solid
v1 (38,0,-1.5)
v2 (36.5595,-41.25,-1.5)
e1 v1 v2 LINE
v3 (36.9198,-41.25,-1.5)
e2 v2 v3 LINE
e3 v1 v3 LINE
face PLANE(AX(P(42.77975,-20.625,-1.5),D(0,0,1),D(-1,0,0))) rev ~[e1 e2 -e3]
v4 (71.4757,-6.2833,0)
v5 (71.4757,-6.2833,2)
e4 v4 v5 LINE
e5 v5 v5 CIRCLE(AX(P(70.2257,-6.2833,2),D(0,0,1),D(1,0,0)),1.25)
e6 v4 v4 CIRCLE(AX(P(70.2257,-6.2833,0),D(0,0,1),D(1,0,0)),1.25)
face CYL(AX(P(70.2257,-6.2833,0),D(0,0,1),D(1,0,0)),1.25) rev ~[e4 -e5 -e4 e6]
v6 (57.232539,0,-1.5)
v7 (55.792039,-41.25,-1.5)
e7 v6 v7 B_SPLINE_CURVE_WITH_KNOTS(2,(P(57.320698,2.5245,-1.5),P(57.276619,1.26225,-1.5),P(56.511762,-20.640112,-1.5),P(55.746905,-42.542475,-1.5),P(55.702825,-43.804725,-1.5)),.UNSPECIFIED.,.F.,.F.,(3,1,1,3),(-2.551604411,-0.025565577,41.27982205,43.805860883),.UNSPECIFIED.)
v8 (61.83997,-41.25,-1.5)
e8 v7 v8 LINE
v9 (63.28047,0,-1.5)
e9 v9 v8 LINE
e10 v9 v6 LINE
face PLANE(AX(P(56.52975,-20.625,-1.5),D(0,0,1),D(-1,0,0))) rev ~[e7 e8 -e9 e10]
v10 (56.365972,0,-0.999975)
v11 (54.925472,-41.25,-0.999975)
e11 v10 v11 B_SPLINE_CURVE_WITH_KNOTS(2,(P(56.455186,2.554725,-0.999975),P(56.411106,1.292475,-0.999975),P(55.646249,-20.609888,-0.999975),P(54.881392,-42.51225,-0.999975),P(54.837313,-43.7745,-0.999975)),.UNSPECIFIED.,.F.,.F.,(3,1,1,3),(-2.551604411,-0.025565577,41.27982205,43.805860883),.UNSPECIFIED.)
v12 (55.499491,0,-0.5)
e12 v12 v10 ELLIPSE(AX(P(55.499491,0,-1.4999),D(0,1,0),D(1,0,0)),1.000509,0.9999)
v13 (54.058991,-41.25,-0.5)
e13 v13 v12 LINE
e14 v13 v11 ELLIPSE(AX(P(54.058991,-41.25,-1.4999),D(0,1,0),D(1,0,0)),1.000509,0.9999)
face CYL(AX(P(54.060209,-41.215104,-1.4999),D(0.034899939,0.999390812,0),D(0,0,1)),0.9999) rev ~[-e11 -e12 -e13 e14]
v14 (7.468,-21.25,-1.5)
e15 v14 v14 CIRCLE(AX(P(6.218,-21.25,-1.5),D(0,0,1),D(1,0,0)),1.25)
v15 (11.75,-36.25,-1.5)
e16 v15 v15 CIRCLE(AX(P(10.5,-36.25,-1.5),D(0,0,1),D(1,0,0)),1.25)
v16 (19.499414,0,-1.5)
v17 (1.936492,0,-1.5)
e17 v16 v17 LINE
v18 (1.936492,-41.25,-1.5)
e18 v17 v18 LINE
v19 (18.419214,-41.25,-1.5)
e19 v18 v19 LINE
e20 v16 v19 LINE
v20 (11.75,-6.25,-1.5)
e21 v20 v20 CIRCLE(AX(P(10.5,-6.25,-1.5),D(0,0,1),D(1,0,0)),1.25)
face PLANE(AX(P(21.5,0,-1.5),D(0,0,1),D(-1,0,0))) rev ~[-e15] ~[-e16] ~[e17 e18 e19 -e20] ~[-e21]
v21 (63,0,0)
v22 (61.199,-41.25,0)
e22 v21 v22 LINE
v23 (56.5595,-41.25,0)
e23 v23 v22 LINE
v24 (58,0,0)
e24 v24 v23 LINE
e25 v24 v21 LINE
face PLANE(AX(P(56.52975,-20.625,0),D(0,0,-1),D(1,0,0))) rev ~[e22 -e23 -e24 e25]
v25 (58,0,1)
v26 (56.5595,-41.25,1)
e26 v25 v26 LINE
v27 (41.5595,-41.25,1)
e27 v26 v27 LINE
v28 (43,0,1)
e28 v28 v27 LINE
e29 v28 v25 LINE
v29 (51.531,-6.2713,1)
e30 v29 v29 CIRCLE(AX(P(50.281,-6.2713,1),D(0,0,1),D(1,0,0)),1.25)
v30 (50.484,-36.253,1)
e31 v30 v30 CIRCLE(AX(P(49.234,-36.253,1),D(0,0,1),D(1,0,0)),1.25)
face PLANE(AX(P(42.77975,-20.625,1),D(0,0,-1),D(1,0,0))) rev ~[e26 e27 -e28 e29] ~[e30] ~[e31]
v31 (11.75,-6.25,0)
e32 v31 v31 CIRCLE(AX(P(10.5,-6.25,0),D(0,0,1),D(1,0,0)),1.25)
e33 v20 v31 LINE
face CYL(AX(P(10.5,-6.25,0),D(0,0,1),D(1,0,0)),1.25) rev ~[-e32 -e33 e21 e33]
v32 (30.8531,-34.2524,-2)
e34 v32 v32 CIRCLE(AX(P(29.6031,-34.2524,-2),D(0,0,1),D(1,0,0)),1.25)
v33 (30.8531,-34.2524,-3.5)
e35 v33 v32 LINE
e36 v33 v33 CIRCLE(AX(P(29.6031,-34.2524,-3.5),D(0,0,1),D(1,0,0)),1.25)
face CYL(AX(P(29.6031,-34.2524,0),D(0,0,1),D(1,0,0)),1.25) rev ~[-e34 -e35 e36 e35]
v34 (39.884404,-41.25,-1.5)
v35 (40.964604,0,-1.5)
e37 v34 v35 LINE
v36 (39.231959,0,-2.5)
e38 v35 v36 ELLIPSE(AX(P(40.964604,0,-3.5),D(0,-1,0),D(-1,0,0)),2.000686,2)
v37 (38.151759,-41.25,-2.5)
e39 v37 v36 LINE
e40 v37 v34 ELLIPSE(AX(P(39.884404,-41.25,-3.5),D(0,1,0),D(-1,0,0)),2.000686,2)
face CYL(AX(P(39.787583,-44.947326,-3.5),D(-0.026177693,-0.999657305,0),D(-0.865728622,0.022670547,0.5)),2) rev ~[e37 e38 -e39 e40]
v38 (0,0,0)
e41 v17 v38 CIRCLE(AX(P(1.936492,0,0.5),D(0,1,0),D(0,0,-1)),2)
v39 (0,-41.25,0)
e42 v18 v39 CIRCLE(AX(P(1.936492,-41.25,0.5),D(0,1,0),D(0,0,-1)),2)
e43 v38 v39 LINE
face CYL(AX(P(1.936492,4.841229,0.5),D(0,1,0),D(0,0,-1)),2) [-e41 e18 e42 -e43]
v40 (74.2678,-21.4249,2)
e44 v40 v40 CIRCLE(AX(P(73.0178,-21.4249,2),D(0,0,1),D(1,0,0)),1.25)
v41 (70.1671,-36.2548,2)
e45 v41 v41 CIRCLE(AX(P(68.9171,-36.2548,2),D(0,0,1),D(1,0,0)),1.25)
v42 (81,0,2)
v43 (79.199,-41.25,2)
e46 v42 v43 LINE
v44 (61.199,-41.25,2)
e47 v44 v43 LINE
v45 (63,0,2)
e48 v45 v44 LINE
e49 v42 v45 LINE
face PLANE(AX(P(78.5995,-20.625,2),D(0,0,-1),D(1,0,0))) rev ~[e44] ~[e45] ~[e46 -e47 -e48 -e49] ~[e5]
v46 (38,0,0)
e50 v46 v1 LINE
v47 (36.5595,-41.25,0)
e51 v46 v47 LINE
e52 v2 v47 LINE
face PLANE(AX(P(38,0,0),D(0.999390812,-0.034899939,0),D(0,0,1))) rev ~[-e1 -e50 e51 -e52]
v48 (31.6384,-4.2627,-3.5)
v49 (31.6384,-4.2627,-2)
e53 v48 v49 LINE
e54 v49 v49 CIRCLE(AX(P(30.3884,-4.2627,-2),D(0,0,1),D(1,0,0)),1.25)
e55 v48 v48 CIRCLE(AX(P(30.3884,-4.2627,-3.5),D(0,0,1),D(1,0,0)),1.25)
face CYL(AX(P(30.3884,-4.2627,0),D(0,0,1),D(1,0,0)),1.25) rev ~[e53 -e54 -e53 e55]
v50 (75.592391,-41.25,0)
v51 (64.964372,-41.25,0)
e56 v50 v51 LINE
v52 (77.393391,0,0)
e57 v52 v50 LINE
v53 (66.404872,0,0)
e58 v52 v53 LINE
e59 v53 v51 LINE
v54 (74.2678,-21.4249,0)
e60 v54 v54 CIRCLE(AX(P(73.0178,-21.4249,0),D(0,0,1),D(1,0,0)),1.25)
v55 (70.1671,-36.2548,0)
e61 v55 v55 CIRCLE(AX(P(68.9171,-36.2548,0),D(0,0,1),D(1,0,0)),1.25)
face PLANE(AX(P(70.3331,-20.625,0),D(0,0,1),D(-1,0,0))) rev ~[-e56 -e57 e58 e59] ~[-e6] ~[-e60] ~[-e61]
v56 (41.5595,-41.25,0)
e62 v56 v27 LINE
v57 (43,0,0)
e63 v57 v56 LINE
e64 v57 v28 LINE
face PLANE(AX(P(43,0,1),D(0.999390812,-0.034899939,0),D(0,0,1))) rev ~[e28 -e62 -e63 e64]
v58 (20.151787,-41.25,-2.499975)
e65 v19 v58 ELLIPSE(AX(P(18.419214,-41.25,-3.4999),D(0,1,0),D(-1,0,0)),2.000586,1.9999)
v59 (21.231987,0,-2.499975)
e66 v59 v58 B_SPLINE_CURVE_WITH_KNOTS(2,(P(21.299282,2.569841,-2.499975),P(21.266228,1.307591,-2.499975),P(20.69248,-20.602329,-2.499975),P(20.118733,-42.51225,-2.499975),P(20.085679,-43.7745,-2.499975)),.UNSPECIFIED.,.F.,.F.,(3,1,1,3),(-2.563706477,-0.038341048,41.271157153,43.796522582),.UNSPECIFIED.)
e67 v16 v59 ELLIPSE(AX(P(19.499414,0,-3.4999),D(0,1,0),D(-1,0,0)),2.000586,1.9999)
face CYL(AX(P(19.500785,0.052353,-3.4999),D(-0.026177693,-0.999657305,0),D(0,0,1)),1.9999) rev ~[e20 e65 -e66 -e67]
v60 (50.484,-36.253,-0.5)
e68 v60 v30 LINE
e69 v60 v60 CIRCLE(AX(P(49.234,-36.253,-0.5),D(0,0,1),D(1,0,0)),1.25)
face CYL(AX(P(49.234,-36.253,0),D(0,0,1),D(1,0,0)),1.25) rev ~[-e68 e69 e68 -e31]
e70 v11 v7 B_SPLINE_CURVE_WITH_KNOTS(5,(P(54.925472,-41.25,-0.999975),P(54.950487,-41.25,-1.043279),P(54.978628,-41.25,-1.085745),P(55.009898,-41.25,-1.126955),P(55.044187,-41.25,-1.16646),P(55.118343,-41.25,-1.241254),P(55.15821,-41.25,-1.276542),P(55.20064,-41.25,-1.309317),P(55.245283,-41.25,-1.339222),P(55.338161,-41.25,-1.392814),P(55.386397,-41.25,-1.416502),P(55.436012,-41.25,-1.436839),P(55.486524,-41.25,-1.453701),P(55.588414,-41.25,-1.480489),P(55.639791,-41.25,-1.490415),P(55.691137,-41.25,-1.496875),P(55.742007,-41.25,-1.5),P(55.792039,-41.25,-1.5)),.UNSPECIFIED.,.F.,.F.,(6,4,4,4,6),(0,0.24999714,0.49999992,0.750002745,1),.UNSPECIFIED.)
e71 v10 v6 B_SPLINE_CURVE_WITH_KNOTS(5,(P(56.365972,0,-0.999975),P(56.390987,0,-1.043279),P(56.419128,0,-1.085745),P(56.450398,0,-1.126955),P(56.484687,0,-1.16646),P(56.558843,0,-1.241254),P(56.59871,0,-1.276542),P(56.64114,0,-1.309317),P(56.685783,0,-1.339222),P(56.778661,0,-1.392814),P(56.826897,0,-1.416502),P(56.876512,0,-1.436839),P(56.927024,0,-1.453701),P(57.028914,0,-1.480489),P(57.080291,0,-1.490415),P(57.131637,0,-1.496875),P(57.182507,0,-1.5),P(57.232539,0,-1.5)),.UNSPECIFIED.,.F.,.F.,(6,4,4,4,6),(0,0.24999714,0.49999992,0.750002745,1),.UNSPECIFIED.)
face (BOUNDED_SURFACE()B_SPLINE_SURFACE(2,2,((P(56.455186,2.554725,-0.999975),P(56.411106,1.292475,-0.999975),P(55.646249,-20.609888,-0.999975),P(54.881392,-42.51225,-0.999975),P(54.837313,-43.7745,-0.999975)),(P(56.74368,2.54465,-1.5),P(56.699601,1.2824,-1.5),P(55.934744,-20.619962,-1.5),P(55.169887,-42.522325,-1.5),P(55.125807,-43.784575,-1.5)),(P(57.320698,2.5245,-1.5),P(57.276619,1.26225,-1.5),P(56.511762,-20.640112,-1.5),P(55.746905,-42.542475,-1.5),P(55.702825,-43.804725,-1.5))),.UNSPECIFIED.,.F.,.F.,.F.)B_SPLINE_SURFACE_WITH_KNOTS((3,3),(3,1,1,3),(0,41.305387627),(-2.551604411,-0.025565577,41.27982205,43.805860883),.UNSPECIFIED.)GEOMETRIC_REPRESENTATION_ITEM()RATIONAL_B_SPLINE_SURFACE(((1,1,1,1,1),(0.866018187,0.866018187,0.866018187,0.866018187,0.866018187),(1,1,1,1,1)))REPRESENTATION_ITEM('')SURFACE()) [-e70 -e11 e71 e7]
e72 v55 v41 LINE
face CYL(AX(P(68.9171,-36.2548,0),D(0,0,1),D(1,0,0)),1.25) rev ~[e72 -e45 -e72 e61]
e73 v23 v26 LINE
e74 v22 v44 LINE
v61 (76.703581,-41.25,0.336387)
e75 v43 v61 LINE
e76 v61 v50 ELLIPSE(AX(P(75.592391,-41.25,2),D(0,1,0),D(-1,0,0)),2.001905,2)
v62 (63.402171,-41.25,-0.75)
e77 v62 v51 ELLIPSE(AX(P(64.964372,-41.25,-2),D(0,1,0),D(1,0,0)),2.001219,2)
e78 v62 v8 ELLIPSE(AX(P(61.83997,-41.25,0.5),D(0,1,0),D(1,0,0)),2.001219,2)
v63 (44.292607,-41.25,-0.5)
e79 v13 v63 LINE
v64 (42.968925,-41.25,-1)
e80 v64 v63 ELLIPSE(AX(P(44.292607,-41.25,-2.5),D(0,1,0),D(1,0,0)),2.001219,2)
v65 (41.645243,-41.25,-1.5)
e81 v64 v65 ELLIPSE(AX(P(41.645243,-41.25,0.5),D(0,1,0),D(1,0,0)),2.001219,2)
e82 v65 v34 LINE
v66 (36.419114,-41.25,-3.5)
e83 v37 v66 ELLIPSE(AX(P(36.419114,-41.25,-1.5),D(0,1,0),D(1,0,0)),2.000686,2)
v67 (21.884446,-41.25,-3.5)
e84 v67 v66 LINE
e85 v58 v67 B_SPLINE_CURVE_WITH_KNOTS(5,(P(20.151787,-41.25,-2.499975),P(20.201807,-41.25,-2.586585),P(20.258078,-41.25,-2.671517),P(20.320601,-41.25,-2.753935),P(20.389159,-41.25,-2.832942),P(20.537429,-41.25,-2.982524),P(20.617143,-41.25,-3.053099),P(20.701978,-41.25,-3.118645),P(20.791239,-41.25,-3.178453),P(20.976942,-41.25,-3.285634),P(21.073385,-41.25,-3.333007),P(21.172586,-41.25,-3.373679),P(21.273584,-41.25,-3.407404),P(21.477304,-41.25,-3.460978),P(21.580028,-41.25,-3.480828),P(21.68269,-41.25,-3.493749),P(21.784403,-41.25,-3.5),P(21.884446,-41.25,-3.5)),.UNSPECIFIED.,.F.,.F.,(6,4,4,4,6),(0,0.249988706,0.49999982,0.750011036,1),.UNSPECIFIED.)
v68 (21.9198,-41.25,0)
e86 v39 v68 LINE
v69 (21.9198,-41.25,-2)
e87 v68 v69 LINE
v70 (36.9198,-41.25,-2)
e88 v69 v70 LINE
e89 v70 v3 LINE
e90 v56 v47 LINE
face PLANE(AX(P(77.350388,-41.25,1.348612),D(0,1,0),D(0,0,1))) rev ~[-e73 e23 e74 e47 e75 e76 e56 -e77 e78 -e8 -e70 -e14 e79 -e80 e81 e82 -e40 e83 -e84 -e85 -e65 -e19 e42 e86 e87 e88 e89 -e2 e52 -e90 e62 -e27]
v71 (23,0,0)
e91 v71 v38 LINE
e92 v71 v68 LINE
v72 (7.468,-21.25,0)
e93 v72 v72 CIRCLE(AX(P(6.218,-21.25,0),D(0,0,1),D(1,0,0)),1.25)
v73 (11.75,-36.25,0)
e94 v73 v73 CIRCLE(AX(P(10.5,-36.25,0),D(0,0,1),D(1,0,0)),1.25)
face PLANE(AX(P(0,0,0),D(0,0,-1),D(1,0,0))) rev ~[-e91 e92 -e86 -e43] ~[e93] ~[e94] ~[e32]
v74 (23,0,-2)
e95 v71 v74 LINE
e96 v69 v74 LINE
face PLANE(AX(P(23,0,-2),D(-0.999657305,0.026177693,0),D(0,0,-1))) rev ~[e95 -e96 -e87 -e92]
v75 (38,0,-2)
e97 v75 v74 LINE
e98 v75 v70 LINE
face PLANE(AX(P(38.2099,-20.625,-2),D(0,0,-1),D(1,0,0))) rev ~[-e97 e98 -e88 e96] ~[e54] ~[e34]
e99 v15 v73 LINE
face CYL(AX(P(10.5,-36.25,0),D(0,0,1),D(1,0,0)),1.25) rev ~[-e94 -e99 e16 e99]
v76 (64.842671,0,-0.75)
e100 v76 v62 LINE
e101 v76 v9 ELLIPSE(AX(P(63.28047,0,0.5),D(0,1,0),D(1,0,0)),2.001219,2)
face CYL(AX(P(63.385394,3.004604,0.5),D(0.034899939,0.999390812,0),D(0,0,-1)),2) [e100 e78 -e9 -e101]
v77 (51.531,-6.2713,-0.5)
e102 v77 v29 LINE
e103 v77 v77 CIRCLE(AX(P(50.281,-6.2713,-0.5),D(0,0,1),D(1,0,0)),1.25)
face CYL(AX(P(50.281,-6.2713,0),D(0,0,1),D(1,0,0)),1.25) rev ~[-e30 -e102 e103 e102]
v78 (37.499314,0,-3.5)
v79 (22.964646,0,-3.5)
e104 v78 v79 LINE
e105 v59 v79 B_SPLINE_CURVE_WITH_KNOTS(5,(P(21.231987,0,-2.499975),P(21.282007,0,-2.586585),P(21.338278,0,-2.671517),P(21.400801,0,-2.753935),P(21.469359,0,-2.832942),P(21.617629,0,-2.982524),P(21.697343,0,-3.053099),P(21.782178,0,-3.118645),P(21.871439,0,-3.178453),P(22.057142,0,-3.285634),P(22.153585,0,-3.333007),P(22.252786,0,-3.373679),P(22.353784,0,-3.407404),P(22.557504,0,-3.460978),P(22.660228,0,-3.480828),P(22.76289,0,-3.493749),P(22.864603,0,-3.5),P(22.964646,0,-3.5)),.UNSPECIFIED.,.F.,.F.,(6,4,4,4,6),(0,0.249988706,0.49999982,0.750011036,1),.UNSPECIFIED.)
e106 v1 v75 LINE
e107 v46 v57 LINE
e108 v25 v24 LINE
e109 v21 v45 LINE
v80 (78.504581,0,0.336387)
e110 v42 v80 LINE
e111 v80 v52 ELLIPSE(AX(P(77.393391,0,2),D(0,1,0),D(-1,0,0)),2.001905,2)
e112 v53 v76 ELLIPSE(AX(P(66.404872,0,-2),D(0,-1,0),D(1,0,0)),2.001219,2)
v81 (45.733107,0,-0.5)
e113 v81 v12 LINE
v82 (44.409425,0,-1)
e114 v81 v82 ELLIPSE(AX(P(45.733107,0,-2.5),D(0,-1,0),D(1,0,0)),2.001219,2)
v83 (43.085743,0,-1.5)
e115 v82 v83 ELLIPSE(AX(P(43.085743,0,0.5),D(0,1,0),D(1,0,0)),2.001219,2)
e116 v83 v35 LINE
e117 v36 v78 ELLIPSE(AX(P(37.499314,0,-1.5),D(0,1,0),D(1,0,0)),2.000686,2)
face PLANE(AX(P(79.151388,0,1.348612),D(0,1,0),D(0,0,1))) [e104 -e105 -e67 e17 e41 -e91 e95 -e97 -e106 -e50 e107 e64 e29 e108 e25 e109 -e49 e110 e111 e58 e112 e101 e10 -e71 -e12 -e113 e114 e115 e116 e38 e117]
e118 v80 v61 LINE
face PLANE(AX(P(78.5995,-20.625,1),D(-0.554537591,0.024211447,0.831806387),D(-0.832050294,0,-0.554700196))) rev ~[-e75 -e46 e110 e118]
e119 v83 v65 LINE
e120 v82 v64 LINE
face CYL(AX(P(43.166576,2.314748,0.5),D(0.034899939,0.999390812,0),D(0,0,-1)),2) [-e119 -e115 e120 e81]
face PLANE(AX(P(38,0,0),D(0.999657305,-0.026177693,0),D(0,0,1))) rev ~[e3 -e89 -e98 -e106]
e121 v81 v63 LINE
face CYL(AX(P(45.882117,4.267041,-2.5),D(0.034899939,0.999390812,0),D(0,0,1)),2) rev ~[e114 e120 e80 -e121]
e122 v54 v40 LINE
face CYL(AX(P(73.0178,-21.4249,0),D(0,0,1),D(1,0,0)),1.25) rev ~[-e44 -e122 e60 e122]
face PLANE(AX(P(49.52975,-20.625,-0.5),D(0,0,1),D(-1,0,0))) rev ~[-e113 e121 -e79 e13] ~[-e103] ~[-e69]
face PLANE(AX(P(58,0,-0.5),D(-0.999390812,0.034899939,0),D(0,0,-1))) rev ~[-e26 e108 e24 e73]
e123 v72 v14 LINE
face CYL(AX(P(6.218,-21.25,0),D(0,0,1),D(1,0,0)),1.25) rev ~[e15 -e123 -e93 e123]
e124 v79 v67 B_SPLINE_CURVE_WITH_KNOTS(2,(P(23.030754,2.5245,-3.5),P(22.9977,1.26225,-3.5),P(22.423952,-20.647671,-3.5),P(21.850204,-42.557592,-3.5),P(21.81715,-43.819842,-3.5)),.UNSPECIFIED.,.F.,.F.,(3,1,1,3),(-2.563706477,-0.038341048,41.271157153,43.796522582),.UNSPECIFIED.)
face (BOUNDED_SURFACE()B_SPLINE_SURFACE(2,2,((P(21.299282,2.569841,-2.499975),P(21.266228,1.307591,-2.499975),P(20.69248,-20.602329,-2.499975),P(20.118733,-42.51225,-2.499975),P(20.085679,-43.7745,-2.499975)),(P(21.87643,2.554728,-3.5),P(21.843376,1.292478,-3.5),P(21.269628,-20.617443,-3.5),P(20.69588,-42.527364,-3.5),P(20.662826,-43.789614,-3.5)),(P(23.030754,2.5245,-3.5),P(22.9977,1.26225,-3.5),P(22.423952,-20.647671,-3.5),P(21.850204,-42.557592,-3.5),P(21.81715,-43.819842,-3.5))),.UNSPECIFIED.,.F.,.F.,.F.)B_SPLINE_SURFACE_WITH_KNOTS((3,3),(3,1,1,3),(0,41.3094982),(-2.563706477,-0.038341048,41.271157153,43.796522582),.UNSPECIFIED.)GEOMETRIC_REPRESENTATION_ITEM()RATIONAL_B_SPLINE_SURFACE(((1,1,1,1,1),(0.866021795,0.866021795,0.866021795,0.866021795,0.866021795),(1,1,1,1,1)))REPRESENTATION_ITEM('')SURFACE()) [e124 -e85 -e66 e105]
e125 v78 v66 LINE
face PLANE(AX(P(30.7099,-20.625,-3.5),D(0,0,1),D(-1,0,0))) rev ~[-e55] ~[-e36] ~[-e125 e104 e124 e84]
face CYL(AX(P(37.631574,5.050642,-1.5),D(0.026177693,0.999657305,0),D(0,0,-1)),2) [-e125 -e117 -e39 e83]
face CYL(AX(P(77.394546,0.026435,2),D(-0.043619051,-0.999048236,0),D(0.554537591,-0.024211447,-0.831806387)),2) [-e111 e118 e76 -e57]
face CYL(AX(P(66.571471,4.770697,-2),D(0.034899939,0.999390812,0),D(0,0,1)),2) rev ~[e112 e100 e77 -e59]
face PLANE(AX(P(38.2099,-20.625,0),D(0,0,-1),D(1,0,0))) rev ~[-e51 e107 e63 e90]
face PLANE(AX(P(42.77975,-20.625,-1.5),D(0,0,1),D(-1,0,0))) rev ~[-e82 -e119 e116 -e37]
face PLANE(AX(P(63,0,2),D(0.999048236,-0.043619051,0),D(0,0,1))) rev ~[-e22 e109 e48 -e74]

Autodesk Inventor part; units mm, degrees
ref_plane "YZ Plane" through (0, 0, 0) normal (1, 0, 0) x (0, 1, 0)
ref_plane "XY Plane" through (0, 0, 0) normal (0, 0, 1) x (1, 0, 0)
sketch "Sketch1" plane through (0, 0, 0) normal (0, 0, 1) x (1, 0, 0)
  line L0 (0, 0) -> (81, 0)
  line L1 (0, 0) -> (0, -41.25)
  line L2 (0, -41.25) -> (76.5595, -41.25)
  line L3 (10.5, 0) -> (10.5, -41.25)
  line L4 (30.5, 0) -> (29.4198, -41.25)
  line L5 (30.5, 0) -> (71.7641, 0) construction
  line L6 (50.5, 0) -> (49.0595, -41.25)
  line L7 (70.5, 0) -> (68.699, -41.25)
  line L8 (78, 0) -> (76.5595, -41.25)
  line L9 (78, 0) -> (119.2751, 0) construction
  line L10 (76.5595, -41.25) -> (81, 0)
  line L11 (3, 0) -> (3, -41.25)
  line L12 (18, 0) -> (18, -41.25)
  line L13 (23, 0) -> (21.9198, -41.25)
  line L14 (23, 0) -> (64.2641, 0) construction
  line L15 (38, 0) -> (36.9198, -41.25)
  line L16 (38, 0) -> (79.2641, 0) construction
  line L17 (43, 0) -> (41.5595, -41.25)
  line L18 (43, 0) -> (84.2751, 0) construction
  line L19 (58, 0) -> (56.5595, -41.25)
  line L20 (58, 0) -> (99.2751, 0) construction
  line L21 (63, 0) -> (61.199, -41.25)
  line L22 (63, 0) -> (104.2893, 0) construction
  line L23 (29.4198, -41.25) -> (29.6031, -34.2524)
  line L24 (29.6031, -34.2524) -> (30.3884, -4.2627)
  line L25 (49.0595, -41.25) -> (49.234, -36.253)
  line L26 (49.234, -36.253) -> (50.281, -6.2713)
  line L27 (68.699, -41.25) -> (68.9171, -36.2548)
  line L28 (68.9171, -36.2548) -> (70.2257, -6.2833)
  circle A0 centre (10.5, -6.25) radius 1.25
  circle A1 centre (10.5, -36.25) radius 1.25
  circle A2 centre (30.3884, -4.2627) radius 1.25
  circle A3 centre (29.6031, -34.2524) radius 1.25
  circle A4 centre (50.281, -6.2713) radius 1.25
  circle A5 centre (49.234, -36.253) radius 1.25
  circle A6 centre (70.2257, -6.2833) radius 1.25
  circle A7 centre (68.9171, -36.2548) radius 1.25
  line L29 (10.5, -6.25) -> (10.5, -21.25)
  line L30 (10.5, -21.25) -> (6.218, -21.25)
  circle A8 centre (6.218, -21.25) radius 1.25
  line L31 (6.218, -21.25) -> (73.0178, -21.4249)
  line L32 (6.218, -21.25) -> (73.018, -21.25) construction
  circle A9 centre (73.0178, -21.4249) radius 1.25
  dimension "d10" = 92
  dimension "d11" = 91.5
  dimension "d12" = 91.5
  dimension "d13" = 92
  dimension "d14" = 92
  dimension "d15" = 92.5
  dimension "d67" = 2.5
  dimension "d68" = 2.5
  dimension "d69" = 2.5
  dimension "d70" = 2.5
  dimension "d71" = 2.5
  dimension "d72" = 2.5
  dimension "d73" = 2.5
  dimension "d74" = 2.5
  dimension "d77" = 15
  dimension "d78" = 4.282
  dimension "d79" = 2.5
  dimension "d80" = 66.8
  dimension "d81" = 0.15
  dimension "d82" = 2.5
sketch "Sketch2" plane through (0, 0, 0) normal (0, 1, 0) x (-1, 0, 0)
  line L0 (-43, 0) -> (-58, 0)
  line L1 (-58, 0) -> (-58, 1)
  line L2 (-58, 1) -> (-43, 1)
  line L3 (-43, 1) -> (-43, 0)
  line L4 (-64.4672, 0) -> (-78, 0)
  line L5 (-78, 0) -> (-78, 2)
  line L6 (-78, 2) -> (-63, 2)
  line L7 (-63, 2) -> (-63, 0)
  line L8 (-23, 0) -> (-21.9198, 0) projected
  line L9 (-30.5, 0) -> (-29.4198, 0) projected
  line L10 (-23, 0) -> (-38, 0)
  line L11 (-38, 0) -> (-38, -2)
  line L12 (-38, -2) -> (-23, -2)
  line L13 (-23, -2) -> (-23, 0)
  line L14 (0, 0) -> (-23, 0)
  line L15 (-23, 0) -> (-23, -1.5)
  line L16 (-21.5, -1.5) -> (0, -1.5)
  line L17 (0, -1.5) -> (0, 0)
  line L18 (-23, 0) -> (-21.5, 0)
  line L19 (-21.5, -1.5) -> (-21.5, -3.5)
  line L20 (-21.5, -3.5) -> (-23, -3.5)
  line L21 (-23, -2) -> (-23, 0)
  line L22 (-23, -2) -> (-38, -2)
  line L23 (-39.5, -2) -> (-39.5, -3.5)
  line L24 (-39.5, -3.5) -> (-23, -3.5)
  line L25 (-39.5, -2) -> (-39.5, -1.5)
  line L26 (-39.5, 0) -> (-38, 0)
  line L27 (-38, 0) -> (-38, -2)
  line L28 (-38, 0) -> (-43, 0)
  line L29 (-43, -0.5) -> (-43, -1.5)
  line L30 (-43, -1.5) -> (-39.5, -1.5)
  line L31 (-38, -1.5) -> (-38, 0)
  line L32 (-43, 1) -> (-58, 1)
  line L33 (-58, 1) -> (-58, 0)
  line L34 (-56.5, -0.5) -> (-44, -0.5)
  line L35 (-43, -0.5) -> (-43, 1)
  line L36 (-38, 0) -> (-44, 0)
  line L37 (-44, -0.5) -> (-44, -1.5)
  line L38 (-44, -1.5) -> (-38, -1.5)
  line L39 (-38, -1.5) -> (-38, 0)
  line L40 (-56.5, 0) -> (-63, 0)
  line L41 (-64.4672, 0) -> (-64.4672, -1.5)
  line L42 (-64.4672, -1.5) -> (-56.5, -1.5)
  line L43 (-56.5, -1.5) -> (-56.5, -0.5)
  line L44 (-81, 2) -> (-78, 2)
  line L45 (-81, 2) -> (-78, 0)
  line L46 (-18, 0) -> (-18, -1.5)
  line L47 (0, 0) -> (-18, 0)
  line L48 (-18, 0) -> (-18, -1.5)
  line L49 (-18, -1.5) -> (0, -1.5)
  line L50 (0, -1.5) -> (0, 0)
  line L51 (-18, -1.5) -> (-18, 0)
  line L52 (-23, 0) -> (-23, -2)
  line L53 (-38, -2) -> (-38, 0)
  line L54 (-43, 0) -> (-43, -1.5)
  line L55 (-18, -1.5) -> (-21.5, -1.5)
  line L56 (-38, -2) -> (-23, -2)
  line L57 (-23, -2) -> (-23, 0)
  line L58 (-23, 0) -> (-18, 0)
  line L59 (-18, 0) -> (-18, -1.5)
  line L60 (-18, 0) -> (-23, 0)
  line L61 (-23, 0) -> (-23, -1.5)
  line L62 (-23, -1.5) -> (-18, -1.5)
  line L63 (-18, -1.5) -> (-18, 0)
  line L64 (-23, 0) -> (-21.5, 0)
  line L65 (-21.5, 0) -> (-21.5, -3.5)
  line L66 (-21.5, -3.5) -> (-23, -3.5)
  line L67 (-23, -3.5) -> (-23, 0)
  line L68 (-21.5, -3.5) -> (-39.5, -3.5)
  line L69 (-39.5, -3.5) -> (-39.5, -2)
  line L70 (-39.5, -2) -> (-21.5, -2)
  line L71 (-21.5, -2) -> (-21.5, -3.5)
  line L72 (-39.5, -2) -> (-38, -2)
  line L73 (-38, -2) -> (-38, 0)
  line L74 (-38, 0) -> (-39.5, 0)
  line L75 (-39.5, 0) -> (-39.5, -2)
  line L76 (-38, 0) -> (-44, 0)
  line L77 (-44, 0) -> (-44, -1.5)
  line L78 (-44, -1.5) -> (-38, -1.5)
  line L79 (-38, -1.5) -> (-38, 0)
  line L80 (-44, -0.5) -> (-58, -0.5)
  line L81 (-58, -0.5) -> (-58, 1)
  line L82 (-58, 1) -> (-44, 1)
  line L83 (-44, 1) -> (-44, -0.5)
  line L84 (-58, 1) -> (-56.5, 1)
  line L85 (-56.5, 1) -> (-56.5, -1.5)
  line L86 (-56.5, -1.5) -> (-58, -1.5)
  line L87 (-58, -1.5) -> (-58, 1)
  line L88 (-56.5, -1.5) -> (-64.4672, -1.5)
  line L89 (-64.4672, -1.5) -> (-64.4672, 0)
  line L90 (-64.4672, 0) -> (-56.5, 0)
  line L91 (-56.5, 0) -> (-56.5, -1.5)
  line L92 (-63, 0) -> (-78, 0)
  line L93 (-78, 0) -> (-78, 2)
  line L94 (-78, 2) -> (-63, 2)
  line L95 (-63, 2) -> (-63, 0)
  point P0 (-50.5, 0)
  point P1 (-58, 0)
  point P2 (-70.5, 0)
  point P3 (-81, 0)
  dimension "d24" = 1.5
  dimension "d29" = 6
ref_plane "Work Plane1" through (0, -41.25, 0) normal (0, 1, 0) x (-1, 0, 0)
sketch "Sketch3" plane through (0, -41.25, 0) normal (0, 1, 0) x (-1, 0, 0)
  line L0 (-23, 0) -> (-21.9198, 0) projected
  line L1 (-30.5, 0) -> (-29.4198, 0) projected
  line L2 (-38, 0) -> (-36.9198, 0) projected
  line L3 (-43, 0) -> (-41.5595, 0) projected
  line L4 (-50.5, 0) -> (-49.0595, 0) projected
  line L5 (-58, 0) -> (-56.5595, 0) projected
  line L6 (-63, 0) -> (-61.199, 0) projected
  line L7 (-70.5, 0) -> (-68.699, 0) projected
  line L8 (-78, 0) -> (-76.5595, 0) projected
  point P0 (0, 0)
  point P1 (-3, 0)
  point P2 (-3, 0)
  point P3 (-3, 0)
  point P4 (-10.5, 0)
  point P5 (-10.5, 0)
  point P6 (-10.5, 0)
  point P7 (-18, 0)
  point P8 (-18, 0)
  point P9 (-18, 0)
sketch "Sketch4" plane through (0, -41.25, 0) normal (0, 1, 0) x (-1, 0, 0)
  line L0 (0, 0) -> (-76.5595, 0) projected
  line L1 (-23, 0) -> (-21.9198, 0) projected
  line L2 (-30.5, 0) -> (-29.4198, 0) projected
  line L3 (-38, 0) -> (-36.9198, 0) projected
  line L4 (-43, 0) -> (-41.5595, 0) projected
  line L5 (-50.5, 0) -> (-49.0595, 0) projected
  line L6 (-58, 0) -> (-56.5595, 0) projected
  line L7 (-63, 0) -> (-61.199, 0) projected
  line L8 (-70.5, 0) -> (-68.699, 0) projected
  line L9 (-78, 0) -> (-76.5595, 0) projected
  line L10 (-21.9198, 0) -> (-36.9198, 0)
  line L11 (-36.9198, 0) -> (-36.9198, -2)
  line L12 (-36.9198, -2) -> (-21.9198, -2)
  line L13 (-21.9198, -2) -> (-21.9198, 0)
  line L14 (-41.5595, 0) -> (-56.5595, 0)
  line L15 (-56.5595, 0) -> (-56.5595, 1)
  line L16 (-56.5595, 1) -> (-41.5595, 1)
  line L17 (-41.5595, 1) -> (-41.5595, 0)
  line L18 (-61.199, 0) -> (-76.199, 0)
  line L19 (-76.199, 0) -> (-76.199, 2)
  line L20 (-76.199, 2) -> (-61.199, 2)
  line L21 (-61.199, 2) -> (-61.199, 0)
  point P0 (-3, 0)
  point P1 (-3, 0)
  point P2 (-3, 0)
  point P3 (-10.5, 0)
  point P4 (-10.5, 0)
  point P5 (-10.5, 0)
  point P6 (-18, 0)
  point P7 (-18, 0)
  point P8 (-18, 0)
  point P9 (-3, 0)
  point P10 (-10.5, 0)
  point P11 (-18, 0)
  dimension "d17" = 15
  dimension "d18" = 2
  dimension "d19" = 1
  dimension "d20" = 15
  dimension "d21" = 2
sketch "Sketch5" plane through (0, 0, 0) normal (0, 1, 0) x (-1, 0, 0)
  point P0 (0, 0)
sweep "Sweep1" add profiles "Sketch2" path "Sketch1" path curves L3 contours L14 L17 L16 L46
sweep "Sweep2" add profiles "Sketch2" path "Sketch1" path curves L13 contours L8 L14 L65 L62 L13 | L14 L46 L16 L65
sweep "Sweep3" add profiles "Sketch2" path "Sketch1" path curves L4 contours L70 L12 L67 L24 L23 | L70 L19 L20 L67
sweep "Sweep4" add profiles "Sketch2" path "Sketch1" path curves L4 contours L70 L19 L20 L67 | L13 L62 L19 L70
sketch3d "3D Sketch1"
  line L0 (39.5, 0, -2) -> (38.4198, -41.25, -2)
sweep "Sweep5" add profiles "Sketch2" path "3D Sketch1" contours L26 L11 L38 L75 | L38 L11 L70 L25
sweep "Sweep6" add profiles "Sketch2" path "Sketch1" path curves L17 contours L35 L29 L38 L37 L77 L0 | L28 L75 L30 L29 L35 | L26 L11 L38 L75
sweep "Sweep7" add profiles "Sketch2" path "Sketch1" path curves L6 contours L0 L83 L2 L3 | L0 L85 L2 L83 | L0 L1 L2 L85
sweep "Sweep8" add profiles "Sketch2" path "Sketch1" path curves L6 contours L77 L34 L85 L0 | L0 L85 L2 L83 | L85 L80 L81 L0 | L0 L1 L2 L85
sweep "Sweep9" add profiles "Sketch2" path "Sketch1" path curves L19 contours L85 L80 L81 L0 | L0 L1 L2 L85 | L43 L42 L87 L80
sketch3d "3D Sketch2"
  line L0 (58, 0, 1) -> (56.5595, -41.25, 1)
sweep "Sweep10" add profiles "Sketch2" path "3D Sketch2" contours L85 L80 L81 L0 | L81 L87 L42 L41 L90 L40 | L43 L42 L87 L80
sweep "Sweep11" add profiles "Sketch2" path "Sketch1" path curves L21 contours L90 L4 L5 L6 L7
sketch3d "3D Sketch3"
  line L0 (78, 0, 2) -> (76.199, -41.25, 2)
sweep "Sweep12" add profiles "Sketch2" path "3D Sketch3" contours L5 L45 L44
fillet "Fillet1" radius 2 1 edges at (77.0995, -20.625, 0)
fillet "Fillet2" radius 2 2 edges at (63.7469, -20.625, -1.5) (63.7469, -20.625, 0)
fillet "Fillet3" radius 1 2 edges at (55.7798, -20.625, -1.5) (55.7798, -20.625, -0.5)
fillet "Fillet4" radius 2 2 edges at (43.2798, -20.625, -0.5) (43.2798, -20.625, -1.5)
fillet "Fillet5" radius 2 2 edges at (38.9599, -20.625, -1.5) (38.9599, -20.625, -3.5)
fillet "Fillet6" radius 2 2 edges at (20.9599, -20.625, -3.5) (20.9599, -20.625, -1.5)
fillet "Fillet7" radius 2 1 edges at (0, -20.625, -1.5)
extrude "Extrusion1" cut sketch "Sketch1" along normal through all both and the other way through all contours A0 L3 | L3 A0 | A1 L3 | L3 A1 | A2 L4 | L4 A2 | A3 L4 | L4 A3 | A4 L6 | L6 A4 | A5 L6 | L6 A5 | A6 L7 | L7 A6 | A7 L7 | L7 A7
extrude "Extrusion2" cut sketch "Sketch1" along normal through all both and the other way through all contours L31 L30 A8 | A8 L30 L31 | A9
properties part number "Finger_New_Support_base_Screwing"
